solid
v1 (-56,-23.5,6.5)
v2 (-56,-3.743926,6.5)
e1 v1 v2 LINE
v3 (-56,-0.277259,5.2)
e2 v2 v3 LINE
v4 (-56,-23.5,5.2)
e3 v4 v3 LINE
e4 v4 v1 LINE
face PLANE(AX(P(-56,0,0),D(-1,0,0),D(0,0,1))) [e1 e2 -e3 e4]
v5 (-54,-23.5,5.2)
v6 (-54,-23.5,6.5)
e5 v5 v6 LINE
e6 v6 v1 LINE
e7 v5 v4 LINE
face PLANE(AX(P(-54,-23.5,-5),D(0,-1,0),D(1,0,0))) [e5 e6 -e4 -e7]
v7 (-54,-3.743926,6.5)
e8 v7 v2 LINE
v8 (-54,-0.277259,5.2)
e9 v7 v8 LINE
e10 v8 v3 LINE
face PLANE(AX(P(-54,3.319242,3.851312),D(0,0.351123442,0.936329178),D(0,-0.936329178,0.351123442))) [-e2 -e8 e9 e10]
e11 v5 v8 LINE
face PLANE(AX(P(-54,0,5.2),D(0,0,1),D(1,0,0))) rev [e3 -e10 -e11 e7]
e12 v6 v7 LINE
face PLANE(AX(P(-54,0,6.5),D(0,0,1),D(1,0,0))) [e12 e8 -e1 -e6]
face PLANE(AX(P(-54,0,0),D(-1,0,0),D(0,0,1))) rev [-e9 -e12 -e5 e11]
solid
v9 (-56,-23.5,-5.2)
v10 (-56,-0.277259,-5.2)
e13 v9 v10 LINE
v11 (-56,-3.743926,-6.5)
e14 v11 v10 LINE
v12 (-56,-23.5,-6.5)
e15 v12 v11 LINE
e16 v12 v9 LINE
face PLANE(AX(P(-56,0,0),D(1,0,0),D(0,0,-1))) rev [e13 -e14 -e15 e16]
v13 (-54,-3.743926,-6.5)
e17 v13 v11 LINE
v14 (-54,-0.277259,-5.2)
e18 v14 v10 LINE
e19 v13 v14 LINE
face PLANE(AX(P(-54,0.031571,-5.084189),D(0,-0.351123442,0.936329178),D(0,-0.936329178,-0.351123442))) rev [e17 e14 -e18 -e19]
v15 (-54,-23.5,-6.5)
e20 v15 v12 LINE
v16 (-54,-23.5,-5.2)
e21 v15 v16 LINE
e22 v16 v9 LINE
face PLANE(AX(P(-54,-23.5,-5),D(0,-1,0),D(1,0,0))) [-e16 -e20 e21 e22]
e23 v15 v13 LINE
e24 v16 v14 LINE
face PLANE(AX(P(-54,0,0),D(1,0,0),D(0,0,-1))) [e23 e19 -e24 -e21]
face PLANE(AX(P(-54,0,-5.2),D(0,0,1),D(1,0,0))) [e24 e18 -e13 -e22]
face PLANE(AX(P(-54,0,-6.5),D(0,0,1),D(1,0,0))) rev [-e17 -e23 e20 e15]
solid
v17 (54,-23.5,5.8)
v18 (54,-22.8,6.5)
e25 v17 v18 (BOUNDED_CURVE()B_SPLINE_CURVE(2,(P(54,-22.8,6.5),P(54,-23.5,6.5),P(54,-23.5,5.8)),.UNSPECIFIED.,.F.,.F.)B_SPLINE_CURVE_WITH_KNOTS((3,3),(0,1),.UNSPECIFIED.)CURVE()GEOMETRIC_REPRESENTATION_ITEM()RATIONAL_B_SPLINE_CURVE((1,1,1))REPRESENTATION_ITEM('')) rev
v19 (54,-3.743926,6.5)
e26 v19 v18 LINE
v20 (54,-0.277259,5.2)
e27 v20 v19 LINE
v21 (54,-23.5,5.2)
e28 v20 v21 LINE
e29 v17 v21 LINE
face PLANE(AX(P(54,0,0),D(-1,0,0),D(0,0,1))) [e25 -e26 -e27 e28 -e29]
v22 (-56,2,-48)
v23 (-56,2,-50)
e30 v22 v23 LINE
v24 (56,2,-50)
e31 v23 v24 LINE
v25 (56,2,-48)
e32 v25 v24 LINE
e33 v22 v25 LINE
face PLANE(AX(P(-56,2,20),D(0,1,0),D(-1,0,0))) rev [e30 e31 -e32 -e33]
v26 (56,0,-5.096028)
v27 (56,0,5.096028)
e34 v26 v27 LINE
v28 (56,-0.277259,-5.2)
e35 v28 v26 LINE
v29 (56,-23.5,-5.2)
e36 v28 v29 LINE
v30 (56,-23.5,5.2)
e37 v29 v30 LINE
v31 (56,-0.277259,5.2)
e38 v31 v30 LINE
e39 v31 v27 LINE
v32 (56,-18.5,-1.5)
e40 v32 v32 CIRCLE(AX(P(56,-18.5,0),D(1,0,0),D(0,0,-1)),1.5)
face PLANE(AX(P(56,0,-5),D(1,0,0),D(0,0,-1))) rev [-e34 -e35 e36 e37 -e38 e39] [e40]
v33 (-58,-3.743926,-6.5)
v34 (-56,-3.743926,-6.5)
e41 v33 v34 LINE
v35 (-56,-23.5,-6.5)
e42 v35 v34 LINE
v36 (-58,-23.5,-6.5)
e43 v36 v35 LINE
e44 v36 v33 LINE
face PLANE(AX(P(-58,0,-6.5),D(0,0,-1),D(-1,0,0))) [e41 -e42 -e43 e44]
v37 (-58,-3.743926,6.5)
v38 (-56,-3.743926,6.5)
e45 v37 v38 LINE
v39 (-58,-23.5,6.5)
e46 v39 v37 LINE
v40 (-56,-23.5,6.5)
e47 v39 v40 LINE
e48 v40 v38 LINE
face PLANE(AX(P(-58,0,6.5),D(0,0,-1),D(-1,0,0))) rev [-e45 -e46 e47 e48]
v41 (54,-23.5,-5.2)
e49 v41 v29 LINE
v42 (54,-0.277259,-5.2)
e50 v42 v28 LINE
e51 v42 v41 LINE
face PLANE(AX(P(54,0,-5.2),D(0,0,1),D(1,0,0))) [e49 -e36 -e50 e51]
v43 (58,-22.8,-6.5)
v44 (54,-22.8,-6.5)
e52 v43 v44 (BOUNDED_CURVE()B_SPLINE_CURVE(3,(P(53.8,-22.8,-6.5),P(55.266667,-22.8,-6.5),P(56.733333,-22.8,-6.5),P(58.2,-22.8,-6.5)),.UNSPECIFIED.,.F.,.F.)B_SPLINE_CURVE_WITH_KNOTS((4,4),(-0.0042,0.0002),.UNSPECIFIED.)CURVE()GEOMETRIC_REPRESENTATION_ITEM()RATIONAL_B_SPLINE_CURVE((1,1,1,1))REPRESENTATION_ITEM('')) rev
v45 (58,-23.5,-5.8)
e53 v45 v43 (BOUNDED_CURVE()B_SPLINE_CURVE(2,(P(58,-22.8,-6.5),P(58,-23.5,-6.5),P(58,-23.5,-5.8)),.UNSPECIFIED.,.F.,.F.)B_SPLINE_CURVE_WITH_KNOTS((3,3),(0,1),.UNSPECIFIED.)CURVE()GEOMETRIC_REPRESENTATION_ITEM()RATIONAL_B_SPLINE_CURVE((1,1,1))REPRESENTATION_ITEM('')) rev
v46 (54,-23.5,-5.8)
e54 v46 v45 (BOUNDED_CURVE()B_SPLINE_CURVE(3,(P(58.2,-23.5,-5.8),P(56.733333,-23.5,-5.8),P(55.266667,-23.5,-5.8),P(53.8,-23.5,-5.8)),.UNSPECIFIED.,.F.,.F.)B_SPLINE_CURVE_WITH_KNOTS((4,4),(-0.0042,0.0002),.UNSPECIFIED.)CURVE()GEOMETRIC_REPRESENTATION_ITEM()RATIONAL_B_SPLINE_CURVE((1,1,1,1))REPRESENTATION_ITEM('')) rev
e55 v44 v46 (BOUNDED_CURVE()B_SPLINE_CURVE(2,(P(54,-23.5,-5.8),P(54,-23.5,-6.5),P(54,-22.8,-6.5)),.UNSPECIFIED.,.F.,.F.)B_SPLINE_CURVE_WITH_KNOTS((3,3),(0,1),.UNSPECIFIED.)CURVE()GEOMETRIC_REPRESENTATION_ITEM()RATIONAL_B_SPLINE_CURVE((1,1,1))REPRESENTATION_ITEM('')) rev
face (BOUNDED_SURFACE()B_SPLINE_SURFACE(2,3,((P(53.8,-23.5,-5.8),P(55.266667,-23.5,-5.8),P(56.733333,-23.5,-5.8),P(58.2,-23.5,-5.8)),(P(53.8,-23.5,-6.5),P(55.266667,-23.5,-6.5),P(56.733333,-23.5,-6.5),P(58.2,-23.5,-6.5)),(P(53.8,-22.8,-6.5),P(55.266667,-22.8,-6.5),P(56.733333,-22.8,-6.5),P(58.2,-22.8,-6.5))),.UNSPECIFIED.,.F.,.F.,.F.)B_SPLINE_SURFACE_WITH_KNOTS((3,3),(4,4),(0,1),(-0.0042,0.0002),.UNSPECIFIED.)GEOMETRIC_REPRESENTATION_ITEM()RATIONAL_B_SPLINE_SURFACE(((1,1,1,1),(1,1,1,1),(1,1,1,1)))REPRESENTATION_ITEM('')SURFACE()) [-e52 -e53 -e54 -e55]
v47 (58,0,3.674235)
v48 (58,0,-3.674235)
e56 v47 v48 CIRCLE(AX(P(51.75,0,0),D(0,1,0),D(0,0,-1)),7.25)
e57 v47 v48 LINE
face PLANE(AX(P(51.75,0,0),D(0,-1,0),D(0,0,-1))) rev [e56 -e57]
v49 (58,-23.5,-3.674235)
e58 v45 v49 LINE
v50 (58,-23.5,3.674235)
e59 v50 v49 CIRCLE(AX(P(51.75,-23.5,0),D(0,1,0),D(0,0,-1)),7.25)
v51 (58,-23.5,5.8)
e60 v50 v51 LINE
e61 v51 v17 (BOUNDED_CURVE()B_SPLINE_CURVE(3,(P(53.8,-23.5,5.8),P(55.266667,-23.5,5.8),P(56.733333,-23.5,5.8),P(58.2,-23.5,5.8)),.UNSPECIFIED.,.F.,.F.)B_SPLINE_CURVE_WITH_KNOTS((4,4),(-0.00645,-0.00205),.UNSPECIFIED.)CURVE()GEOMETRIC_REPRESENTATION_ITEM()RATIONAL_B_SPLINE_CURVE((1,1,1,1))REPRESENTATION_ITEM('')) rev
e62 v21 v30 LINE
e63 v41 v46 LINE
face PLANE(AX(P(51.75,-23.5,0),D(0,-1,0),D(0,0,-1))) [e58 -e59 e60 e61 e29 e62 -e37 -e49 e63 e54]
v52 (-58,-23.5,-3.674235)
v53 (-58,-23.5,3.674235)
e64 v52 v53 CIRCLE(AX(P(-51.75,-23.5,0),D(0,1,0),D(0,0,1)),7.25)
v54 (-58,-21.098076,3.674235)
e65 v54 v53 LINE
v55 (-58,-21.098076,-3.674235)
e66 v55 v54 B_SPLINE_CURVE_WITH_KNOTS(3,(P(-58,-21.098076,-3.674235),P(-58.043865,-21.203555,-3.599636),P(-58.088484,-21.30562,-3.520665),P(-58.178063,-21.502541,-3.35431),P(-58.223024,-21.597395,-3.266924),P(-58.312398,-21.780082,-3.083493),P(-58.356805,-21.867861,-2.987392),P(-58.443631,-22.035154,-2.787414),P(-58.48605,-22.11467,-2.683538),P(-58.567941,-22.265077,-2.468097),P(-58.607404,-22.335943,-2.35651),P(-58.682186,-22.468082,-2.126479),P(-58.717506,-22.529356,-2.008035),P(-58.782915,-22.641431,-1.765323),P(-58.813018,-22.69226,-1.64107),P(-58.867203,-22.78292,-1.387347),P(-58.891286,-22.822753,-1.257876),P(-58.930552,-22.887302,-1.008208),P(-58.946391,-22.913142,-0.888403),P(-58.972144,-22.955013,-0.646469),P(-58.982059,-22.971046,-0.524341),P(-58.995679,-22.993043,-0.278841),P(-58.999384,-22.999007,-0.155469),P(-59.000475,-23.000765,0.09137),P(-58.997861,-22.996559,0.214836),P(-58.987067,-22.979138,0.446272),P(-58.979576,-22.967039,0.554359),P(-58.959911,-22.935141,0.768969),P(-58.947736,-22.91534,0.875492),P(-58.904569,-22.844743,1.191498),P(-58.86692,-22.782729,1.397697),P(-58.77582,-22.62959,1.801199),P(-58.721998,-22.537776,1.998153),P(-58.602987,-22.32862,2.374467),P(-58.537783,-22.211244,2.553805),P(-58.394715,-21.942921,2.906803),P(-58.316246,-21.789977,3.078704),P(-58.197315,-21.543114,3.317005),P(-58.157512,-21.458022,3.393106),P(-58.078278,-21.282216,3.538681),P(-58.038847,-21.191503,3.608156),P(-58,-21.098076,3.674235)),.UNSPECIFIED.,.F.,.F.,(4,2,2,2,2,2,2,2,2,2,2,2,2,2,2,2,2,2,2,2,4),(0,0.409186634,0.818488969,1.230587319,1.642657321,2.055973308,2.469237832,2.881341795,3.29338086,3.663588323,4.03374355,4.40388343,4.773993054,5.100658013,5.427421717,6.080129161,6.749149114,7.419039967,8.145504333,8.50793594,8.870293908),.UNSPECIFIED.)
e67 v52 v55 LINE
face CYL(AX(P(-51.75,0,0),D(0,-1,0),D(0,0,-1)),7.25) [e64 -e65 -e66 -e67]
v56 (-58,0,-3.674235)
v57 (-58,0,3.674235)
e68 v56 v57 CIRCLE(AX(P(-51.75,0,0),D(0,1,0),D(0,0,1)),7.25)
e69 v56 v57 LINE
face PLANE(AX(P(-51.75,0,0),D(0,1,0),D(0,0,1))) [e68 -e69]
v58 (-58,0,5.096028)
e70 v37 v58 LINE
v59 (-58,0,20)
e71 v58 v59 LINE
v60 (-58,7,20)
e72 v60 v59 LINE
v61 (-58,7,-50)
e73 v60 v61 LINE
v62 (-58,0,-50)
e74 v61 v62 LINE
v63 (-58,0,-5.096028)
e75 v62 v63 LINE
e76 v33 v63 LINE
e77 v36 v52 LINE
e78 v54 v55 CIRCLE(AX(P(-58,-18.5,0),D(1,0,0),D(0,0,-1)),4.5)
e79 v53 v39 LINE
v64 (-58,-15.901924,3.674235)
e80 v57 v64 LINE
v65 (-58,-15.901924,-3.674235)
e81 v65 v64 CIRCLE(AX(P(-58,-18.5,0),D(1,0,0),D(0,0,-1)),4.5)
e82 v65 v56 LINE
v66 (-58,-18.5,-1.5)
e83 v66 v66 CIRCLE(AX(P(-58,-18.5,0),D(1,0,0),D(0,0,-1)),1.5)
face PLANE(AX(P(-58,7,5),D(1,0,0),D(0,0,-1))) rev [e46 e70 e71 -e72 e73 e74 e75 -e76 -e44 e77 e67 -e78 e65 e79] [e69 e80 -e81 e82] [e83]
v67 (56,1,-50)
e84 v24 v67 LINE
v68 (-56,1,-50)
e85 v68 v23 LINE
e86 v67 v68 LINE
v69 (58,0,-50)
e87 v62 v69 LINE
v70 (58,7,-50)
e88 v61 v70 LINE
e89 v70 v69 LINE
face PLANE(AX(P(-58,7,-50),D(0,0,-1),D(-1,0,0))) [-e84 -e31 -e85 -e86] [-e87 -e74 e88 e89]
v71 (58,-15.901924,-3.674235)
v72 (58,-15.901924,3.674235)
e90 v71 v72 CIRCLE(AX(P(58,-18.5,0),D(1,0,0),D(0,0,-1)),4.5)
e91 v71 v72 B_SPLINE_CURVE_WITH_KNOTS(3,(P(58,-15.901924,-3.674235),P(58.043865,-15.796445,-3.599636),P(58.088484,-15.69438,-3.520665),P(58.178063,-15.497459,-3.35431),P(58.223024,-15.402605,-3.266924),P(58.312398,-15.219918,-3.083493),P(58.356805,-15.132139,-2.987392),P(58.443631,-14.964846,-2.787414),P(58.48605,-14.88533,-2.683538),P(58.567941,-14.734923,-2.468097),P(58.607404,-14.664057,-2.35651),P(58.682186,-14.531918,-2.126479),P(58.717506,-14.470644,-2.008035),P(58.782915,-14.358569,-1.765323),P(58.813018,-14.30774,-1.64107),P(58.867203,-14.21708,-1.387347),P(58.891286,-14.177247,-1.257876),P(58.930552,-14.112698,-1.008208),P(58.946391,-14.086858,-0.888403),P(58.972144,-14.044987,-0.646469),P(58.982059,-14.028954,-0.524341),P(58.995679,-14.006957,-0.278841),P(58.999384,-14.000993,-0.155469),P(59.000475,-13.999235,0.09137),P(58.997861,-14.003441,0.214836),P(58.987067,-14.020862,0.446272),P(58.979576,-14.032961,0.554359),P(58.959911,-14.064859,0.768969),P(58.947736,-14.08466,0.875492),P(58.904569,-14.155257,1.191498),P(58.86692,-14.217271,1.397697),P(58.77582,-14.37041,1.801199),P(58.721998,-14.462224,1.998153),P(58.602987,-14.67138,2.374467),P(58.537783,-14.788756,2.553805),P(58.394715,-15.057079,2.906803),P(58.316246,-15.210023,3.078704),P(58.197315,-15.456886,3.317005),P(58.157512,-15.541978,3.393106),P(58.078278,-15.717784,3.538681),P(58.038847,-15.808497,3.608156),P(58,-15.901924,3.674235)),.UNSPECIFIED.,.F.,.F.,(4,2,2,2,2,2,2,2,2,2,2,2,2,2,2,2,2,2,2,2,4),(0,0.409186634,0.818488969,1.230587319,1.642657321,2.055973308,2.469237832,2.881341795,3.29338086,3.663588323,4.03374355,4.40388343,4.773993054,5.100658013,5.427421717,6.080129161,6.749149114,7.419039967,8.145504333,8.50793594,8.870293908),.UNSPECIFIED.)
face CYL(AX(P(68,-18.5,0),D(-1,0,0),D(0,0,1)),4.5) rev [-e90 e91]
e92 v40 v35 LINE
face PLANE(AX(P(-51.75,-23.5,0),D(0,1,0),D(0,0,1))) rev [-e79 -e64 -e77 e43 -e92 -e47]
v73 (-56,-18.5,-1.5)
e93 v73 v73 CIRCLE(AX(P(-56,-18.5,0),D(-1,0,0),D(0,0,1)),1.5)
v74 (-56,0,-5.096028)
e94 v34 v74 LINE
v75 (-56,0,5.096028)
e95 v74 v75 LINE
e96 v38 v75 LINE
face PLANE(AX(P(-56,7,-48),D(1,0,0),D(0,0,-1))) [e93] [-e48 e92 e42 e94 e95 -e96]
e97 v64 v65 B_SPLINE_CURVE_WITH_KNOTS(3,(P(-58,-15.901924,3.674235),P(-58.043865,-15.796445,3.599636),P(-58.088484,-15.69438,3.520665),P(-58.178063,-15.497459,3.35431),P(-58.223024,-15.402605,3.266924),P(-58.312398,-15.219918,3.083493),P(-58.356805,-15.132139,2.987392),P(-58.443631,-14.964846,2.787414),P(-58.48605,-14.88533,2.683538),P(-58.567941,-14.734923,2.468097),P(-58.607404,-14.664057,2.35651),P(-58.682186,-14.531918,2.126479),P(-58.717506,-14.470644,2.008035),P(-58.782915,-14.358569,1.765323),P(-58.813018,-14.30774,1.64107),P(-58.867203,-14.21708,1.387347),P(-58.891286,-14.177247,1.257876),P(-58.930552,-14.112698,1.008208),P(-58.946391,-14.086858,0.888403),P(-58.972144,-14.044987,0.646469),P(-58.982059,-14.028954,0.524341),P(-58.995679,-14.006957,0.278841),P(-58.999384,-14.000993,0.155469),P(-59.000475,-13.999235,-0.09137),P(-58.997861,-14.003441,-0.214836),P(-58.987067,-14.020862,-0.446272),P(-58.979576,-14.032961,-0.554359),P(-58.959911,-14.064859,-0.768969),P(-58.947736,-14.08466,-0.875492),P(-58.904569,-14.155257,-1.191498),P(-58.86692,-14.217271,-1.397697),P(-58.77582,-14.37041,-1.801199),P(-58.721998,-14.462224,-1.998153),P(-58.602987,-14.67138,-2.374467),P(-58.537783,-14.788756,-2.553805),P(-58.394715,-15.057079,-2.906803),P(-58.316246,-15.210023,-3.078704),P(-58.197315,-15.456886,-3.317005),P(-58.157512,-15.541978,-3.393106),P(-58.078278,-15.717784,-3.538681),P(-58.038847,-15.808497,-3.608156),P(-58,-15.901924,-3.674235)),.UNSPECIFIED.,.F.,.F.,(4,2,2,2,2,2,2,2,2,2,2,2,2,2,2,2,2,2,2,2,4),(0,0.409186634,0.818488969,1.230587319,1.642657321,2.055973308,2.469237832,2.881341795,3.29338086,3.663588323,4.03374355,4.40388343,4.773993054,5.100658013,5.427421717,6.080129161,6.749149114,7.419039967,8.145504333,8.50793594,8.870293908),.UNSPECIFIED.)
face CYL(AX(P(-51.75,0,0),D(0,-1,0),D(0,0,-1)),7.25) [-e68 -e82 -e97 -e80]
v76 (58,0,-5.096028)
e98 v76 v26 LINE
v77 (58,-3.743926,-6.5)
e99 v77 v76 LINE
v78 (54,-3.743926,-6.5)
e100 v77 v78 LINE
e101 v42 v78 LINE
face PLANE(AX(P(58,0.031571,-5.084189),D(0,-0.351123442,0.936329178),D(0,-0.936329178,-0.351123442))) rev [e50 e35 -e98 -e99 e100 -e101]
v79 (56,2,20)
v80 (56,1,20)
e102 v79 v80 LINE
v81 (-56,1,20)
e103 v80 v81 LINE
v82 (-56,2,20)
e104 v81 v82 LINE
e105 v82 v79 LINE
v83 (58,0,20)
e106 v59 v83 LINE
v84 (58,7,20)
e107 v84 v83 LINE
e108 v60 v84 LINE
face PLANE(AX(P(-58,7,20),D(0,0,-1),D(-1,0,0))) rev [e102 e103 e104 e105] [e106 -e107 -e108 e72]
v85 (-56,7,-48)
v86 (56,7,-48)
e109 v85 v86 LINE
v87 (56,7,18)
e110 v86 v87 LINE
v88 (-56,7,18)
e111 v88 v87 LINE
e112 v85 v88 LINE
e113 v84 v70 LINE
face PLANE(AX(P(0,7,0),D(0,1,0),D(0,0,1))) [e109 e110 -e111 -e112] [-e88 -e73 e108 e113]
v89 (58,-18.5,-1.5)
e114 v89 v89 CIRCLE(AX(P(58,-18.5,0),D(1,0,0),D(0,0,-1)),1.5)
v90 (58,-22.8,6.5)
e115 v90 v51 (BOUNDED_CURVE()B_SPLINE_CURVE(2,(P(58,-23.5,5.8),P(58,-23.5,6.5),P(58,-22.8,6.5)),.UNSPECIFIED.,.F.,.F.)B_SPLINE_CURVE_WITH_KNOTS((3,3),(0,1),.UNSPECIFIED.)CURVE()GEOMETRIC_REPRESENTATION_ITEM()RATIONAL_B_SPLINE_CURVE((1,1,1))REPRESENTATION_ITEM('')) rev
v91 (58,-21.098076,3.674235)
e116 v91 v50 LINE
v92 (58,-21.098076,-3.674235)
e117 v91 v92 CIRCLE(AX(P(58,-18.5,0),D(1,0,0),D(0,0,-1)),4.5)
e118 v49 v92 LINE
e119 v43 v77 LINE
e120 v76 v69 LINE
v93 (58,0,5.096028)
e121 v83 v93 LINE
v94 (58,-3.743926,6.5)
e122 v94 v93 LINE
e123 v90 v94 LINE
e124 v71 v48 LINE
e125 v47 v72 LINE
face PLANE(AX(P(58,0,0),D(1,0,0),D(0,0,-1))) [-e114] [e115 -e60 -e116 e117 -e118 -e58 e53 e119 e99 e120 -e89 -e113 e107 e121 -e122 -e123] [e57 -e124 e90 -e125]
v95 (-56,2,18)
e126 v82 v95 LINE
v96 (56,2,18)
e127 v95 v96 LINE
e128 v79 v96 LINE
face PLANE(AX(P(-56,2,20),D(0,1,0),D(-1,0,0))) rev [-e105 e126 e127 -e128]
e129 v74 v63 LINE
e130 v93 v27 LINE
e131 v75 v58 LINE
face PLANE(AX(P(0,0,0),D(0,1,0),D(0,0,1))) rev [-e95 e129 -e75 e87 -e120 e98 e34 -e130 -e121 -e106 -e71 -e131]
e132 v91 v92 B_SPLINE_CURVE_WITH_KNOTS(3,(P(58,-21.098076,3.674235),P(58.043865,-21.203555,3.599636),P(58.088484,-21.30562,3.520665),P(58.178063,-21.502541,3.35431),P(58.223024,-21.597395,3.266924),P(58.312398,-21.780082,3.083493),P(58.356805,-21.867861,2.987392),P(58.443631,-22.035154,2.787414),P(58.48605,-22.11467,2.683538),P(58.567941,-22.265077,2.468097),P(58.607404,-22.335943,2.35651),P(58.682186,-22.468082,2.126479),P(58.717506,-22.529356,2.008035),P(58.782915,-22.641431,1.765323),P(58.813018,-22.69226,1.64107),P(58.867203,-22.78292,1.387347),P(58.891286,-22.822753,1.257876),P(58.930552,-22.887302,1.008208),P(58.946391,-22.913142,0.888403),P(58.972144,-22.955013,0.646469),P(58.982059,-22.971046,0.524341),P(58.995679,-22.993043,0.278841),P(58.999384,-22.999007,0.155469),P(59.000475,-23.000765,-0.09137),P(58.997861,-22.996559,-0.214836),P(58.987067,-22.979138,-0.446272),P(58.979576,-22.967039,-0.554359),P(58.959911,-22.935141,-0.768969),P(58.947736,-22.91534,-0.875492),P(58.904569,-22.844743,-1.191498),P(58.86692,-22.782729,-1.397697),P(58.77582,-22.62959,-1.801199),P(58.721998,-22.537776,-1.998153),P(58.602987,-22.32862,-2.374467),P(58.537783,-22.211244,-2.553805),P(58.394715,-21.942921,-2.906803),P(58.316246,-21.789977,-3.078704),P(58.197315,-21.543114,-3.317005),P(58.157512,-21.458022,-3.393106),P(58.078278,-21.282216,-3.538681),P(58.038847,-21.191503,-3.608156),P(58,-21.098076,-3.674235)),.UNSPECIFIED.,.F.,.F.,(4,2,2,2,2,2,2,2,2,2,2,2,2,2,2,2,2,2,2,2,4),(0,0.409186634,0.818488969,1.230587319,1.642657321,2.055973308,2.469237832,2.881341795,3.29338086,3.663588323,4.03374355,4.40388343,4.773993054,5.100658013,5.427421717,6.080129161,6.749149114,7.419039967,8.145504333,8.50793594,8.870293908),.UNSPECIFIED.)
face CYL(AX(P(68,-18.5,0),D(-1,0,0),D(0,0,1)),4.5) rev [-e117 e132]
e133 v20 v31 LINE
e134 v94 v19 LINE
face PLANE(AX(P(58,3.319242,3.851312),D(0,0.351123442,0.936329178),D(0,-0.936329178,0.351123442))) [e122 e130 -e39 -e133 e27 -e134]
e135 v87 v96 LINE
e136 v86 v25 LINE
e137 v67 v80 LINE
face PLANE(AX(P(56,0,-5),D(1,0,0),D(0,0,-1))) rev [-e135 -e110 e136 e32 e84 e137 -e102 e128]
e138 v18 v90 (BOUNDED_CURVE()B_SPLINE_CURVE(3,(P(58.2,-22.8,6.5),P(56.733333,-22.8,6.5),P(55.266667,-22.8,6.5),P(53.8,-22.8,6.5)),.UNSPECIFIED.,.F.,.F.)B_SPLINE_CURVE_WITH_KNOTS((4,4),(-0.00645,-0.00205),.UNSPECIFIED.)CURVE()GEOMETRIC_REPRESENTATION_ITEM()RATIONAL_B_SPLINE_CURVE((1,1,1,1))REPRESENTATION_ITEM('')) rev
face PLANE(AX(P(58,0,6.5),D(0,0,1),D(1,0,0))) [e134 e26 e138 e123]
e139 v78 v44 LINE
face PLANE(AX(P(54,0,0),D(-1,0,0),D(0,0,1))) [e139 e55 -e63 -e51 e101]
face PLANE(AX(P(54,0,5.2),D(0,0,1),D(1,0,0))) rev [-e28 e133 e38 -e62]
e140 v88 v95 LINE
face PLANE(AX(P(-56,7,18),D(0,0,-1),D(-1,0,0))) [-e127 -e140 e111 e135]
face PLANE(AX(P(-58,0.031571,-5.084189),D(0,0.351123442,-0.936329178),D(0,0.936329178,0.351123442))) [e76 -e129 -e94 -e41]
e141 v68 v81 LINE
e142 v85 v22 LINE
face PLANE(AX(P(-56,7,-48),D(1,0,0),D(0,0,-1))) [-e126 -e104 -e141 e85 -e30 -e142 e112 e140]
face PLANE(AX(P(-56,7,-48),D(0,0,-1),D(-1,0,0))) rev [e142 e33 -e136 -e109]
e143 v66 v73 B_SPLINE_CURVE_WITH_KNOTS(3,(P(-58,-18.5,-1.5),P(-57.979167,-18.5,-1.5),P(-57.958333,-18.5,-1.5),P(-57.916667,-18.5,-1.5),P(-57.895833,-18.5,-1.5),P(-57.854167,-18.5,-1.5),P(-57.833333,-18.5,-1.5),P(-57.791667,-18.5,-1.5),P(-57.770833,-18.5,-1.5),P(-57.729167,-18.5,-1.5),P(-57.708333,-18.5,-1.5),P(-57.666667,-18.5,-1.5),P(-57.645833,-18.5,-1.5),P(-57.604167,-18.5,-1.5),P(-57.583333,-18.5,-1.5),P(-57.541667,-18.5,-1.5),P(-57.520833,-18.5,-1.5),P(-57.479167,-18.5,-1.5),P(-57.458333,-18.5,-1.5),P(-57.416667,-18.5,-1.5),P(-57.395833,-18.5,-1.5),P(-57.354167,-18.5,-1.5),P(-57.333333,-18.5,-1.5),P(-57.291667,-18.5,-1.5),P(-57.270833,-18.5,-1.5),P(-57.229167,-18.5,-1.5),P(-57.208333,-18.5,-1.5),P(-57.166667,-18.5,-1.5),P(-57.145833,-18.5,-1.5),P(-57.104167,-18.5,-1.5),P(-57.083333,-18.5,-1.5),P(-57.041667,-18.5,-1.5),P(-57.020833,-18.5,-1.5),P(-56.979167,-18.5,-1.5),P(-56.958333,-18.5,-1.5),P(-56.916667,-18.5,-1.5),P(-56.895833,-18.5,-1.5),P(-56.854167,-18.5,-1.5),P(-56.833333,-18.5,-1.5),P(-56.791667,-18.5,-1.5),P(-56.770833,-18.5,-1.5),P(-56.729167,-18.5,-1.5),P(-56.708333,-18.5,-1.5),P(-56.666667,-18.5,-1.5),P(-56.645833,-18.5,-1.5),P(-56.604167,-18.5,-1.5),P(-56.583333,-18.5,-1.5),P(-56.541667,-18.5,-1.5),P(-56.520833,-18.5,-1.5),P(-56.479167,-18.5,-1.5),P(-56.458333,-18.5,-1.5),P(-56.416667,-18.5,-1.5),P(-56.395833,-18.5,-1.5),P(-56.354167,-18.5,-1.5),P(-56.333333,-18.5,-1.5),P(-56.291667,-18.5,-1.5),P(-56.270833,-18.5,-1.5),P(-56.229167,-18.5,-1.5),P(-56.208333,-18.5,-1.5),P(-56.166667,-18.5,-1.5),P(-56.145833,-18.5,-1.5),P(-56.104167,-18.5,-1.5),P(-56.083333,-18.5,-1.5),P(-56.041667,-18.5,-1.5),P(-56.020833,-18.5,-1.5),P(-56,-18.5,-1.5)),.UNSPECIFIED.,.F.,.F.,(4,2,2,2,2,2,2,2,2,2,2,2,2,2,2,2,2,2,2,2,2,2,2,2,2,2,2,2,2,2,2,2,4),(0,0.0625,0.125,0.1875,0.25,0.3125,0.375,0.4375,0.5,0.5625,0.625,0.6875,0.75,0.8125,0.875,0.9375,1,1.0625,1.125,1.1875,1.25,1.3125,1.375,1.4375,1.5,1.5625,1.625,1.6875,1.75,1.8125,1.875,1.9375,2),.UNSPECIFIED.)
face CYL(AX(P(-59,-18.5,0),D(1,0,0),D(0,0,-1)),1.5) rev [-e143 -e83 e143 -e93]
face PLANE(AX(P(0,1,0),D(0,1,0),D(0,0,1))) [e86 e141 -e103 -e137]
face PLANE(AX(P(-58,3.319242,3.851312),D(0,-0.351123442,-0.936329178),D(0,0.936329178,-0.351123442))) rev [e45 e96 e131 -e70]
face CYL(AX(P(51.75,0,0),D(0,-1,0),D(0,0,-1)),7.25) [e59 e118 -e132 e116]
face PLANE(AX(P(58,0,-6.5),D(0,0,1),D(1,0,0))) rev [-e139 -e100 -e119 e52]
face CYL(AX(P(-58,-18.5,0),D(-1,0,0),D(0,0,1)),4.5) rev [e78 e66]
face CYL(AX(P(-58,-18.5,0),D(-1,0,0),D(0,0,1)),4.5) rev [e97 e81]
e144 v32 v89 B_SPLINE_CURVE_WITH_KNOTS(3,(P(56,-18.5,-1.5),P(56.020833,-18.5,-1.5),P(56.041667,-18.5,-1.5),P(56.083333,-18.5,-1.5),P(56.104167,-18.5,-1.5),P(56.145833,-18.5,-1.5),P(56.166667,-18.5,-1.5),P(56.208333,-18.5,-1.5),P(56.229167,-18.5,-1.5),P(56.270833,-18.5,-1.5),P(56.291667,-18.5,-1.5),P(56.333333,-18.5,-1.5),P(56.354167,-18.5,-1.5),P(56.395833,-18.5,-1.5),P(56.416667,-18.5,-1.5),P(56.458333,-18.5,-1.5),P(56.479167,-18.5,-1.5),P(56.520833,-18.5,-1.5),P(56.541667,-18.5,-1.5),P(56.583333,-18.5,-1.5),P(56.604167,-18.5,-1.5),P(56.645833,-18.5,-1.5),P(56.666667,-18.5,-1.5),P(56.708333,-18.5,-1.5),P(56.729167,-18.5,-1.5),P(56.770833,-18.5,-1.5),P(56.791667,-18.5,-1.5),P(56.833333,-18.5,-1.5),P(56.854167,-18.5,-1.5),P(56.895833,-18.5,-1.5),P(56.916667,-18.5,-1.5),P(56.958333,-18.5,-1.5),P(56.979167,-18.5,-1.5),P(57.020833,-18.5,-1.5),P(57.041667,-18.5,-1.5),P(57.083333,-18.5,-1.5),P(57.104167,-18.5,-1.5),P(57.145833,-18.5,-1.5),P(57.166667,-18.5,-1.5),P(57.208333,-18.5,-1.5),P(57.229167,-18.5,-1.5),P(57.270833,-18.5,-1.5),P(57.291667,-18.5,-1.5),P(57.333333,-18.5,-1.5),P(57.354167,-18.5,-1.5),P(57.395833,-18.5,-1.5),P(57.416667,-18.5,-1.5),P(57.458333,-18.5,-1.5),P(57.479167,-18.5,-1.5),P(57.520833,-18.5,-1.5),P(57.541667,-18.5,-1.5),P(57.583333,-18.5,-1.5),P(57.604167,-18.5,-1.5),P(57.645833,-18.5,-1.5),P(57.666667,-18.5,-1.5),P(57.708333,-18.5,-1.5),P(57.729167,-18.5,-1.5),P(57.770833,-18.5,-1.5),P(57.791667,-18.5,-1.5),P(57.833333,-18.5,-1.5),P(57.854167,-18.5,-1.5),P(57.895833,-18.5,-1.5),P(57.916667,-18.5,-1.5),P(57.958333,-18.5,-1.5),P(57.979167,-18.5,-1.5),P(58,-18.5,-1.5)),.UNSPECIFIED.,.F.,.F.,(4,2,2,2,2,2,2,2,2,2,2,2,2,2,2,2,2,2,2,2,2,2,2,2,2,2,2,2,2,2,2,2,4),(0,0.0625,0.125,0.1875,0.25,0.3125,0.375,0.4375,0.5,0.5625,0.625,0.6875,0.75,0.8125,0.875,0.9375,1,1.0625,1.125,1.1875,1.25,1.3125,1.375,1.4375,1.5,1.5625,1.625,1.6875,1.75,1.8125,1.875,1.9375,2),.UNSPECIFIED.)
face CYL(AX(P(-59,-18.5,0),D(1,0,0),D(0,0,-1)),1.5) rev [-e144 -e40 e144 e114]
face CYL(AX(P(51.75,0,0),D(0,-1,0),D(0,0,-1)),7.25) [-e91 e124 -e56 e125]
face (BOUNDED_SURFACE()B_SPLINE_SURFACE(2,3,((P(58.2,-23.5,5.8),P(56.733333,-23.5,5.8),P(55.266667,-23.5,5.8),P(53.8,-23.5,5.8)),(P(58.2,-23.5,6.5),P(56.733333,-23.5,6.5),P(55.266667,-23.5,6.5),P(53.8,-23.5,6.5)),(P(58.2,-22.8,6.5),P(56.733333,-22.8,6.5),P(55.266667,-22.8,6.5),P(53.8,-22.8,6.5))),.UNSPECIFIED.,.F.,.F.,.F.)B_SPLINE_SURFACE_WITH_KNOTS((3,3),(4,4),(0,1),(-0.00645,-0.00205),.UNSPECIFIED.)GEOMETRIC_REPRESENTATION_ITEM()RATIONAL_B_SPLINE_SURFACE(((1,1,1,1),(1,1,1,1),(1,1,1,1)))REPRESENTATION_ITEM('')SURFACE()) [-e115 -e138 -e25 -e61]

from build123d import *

# Parameters (mm, degrees)
DODANIE_WYCI_GNI_CIE1_DEPTH     = 2
DODANIE_WYCI_GNI_CIE2_DEPTH     = 2
DODANIE_WYCI_GNI_CIE3_START     = -114
DODANIE_WYCI_GNI_CIE3_DEPTH     = 2
DODANIE_WYCI_GNI_CIE4_START     = -112
DODANIE_WYCI_GNI_CIE4_DEPTH     = 2
DODANIE_WYCI_GNI_CIE4_2_DEPTH   = 2
WYTNIJ_WYCI_GNI_CIE1_DEPTH      = 118.556369457
WYTNIJ_WYCI_GNI_CIE1_DEPTH_BACK = 118.556369457
SZKIC4_R                        = 1.5
ZAOKR_GLENIE18_SIZE             = 0.7
WYTNIJ_WYCI_GNI_CIE2_START      = 2
SZKIC4_3_R                      = 4.5
SZKIC4_3_R_2                    = 1.5
WYTNIJ_WYCI_GNI_CIE2_DEPTH      = 10
WYTNIJ_WYCI_GNI_CIE3_START      = -116
SZKIC4_4_R                      = 4.5
SZKIC4_4_R_2                    = 1.5
WYTNIJ_WYCI_GNI_CIE3_DEPTH      = 2
SZKIC9_W                        = 112
SZKIC9_H                        = 66
DODANIE_WYCI_GNI_CIE5_DEPTH     = 7
SZKIC9_4_W                      = 112
SZKIC9_4_H                      = 66
DODANIE_WYCI_GNI_CIE6_DEPTH     = 1
SZKIC11_W                       = 112
SZKIC11_H                       = 1
WYTNIJ_WYCI_GNI_CIE4_DEPTH      = 95.515871844


with BuildPart() as part:
    # Wyciągnięcie po ścieżce6: sweep along a path in Szkic8
    with BuildLine(Plane.XY) as wyci_gni_cie_po_cie_ce6_path:
        Line((-57, 0), (-57, -23.5))
    # Szkic3 → Wyciągnięcie po ścieżce6 (sweep)
    with BuildSketch(Plane(origin=(0, 0, 0), x_dir=(1, 0, 0), z_dir=(0, 1, 0))):
        with BuildLine():
            Line((56, 5), (57, 5))
            ThreePointArc((57, 5), (59, 0), (57, -5))
            Line((57, -5), (56, -5))
            Line((56, -5), (56, 5))
        make_face()
        with BuildLine():
            Line((-56, -5), (-57, -5))
            ThreePointArc((-57, -5), (-59, 0), (-57, 5))
            Line((-57, 5), (-56, 5))
            Line((-56, 5), (-56, -5))
        make_face()
    sweep(path=wyci_gni_cie_po_cie_ce6_path.line)

    # Dodanie-wyciągnięcie1: read off the stored shape, not the designer's step
    # Dodanie-wyciągnięcie1 outline → Dodanie-wyciągnięcie1 (add)
    with BuildSketch(Plane(origin=(56, 0, 0), x_dir=(0, 0, -1), z_dir=(1, 0, 0))):
        Polygon((-6.5, -3.743926041), (-6.5, -23.5), (6.5, -23.5), (6.5, -3.743926041), (5, 0.256073959), (5, 0), (-5, 0), (-5, 0.256073959), align=None)
    extrude(amount=DODANIE_WYCI_GNI_CIE1_DEPTH)

    # Szkic5<3> → Dodanie-wyciągnięcie2 (add)
    with BuildSketch(Plane(origin=(56, 0, 0), x_dir=(0, 0, -1), z_dir=(1, 0, 0))):
        Polygon((6.5, -3.743926041), (5.2, -0.277259374), (5.2, -23.5), (6.5, -23.5), align=None)
        Polygon((-5.2, -0.277259374), (-6.5, -3.743926041), (-6.5, -23.5), (-5.2, -23.5), align=None)
    extrude(amount=-DODANIE_WYCI_GNI_CIE2_DEPTH)


with BuildPart() as body_2:
    # Dodanie-wyciągnięcie3: read off the stored shape, not the designer's step
    # Dodanie-wyciągnięcie3 outline → Dodanie-wyciągnięcie3 (new body)
    with BuildSketch(Plane(origin=(56, 0, 0), x_dir=(0, 0, -1), z_dir=(1, 0, 0)).offset(DODANIE_WYCI_GNI_CIE3_START)):
        Polygon((5, 0.256073959), (5, 0), (-5, 0), (-5, 0.256073959), (-6.5, -3.743926041), (-6.5, -23.5), (6.5, -23.5), (6.5, -3.743926041), align=None)
    extrude(amount=DODANIE_WYCI_GNI_CIE3_DEPTH)


with BuildPart() as body_3:
    # Szkic5<6> → Dodanie-wyciągnięcie4 (new body)
    with BuildSketch(Plane(origin=(56, 0, 0), x_dir=(0, 0, -1), z_dir=(1, 0, 0)).offset(DODANIE_WYCI_GNI_CIE4_START)):
        Polygon((-5.2, -0.277259374), (-6.5, -3.743926041), (-6.5, -23.5), (-5.2, -23.5), align=None)
    extrude(amount=DODANIE_WYCI_GNI_CIE4_DEPTH)


with BuildPart() as body_4:
    # Szkic5<6> → Dodanie-wyci_gni_cie4 2 (new body)
    with BuildSketch(Plane(origin=(56, 0, 0), x_dir=(0, 0, -1), z_dir=(1, 0, 0)).offset(DODANIE_WYCI_GNI_CIE4_START)):
        Polygon((6.5, -3.743926041), (5.2, -0.277259374), (5.2, -23.5), (6.5, -23.5), align=None)
    extrude(amount=DODANIE_WYCI_GNI_CIE4_2_DEPTH)


with BuildPart() as wytnij_wyci_gni_cie1_tool:
    # Szkic4 → Wytnij-wyciągnięcie1 (new, two sides: drawn at the far end of the back side and taken through both)
    with BuildSketch(Plane(origin=(56, 0, 0), x_dir=(0, 0, -1), z_dir=(1, 0, 0)).offset(-WYTNIJ_WYCI_GNI_CIE1_DEPTH_BACK)):
        with Locations((0, -18.5)):
            Circle(SZKIC4_R)
    extrude(amount=WYTNIJ_WYCI_GNI_CIE1_DEPTH + WYTNIJ_WYCI_GNI_CIE1_DEPTH_BACK)


with BuildPart() as part_1:
    add(part.part)

    # Wytnij-wyciągnięcie1: cut by wytnij_wyci_gni_cie1_tool
    add(wytnij_wyci_gni_cie1_tool.part, mode=Mode.SUBTRACT)

    # Zaokrąglenie18
    # a fillet whose section is not a circle: 0.7 mm, written as the material it takes off along each edge
    with BuildSketch(Plane(origin=(59.75, -23.5, 6.5), x_dir=(0, 0, -1), z_dir=(-1, 0, 0)), Plane(origin=(52.25, -23.5, -6.5), x_dir=(0, 0, 1), z_dir=(1, 0, 0))) as zaokr_glenie18_piece_1:
        with BuildLine():
            Bezier((ZAOKR_GLENIE18_SIZE, 0), (0, 0), (0, -ZAOKR_GLENIE18_SIZE), weights=[1, 1, 1])
            Line((0, -ZAOKR_GLENIE18_SIZE), (0, 0))
            Line((0, 0), (ZAOKR_GLENIE18_SIZE, 0))
        make_face()
    extrude(amount=7.5, mode=Mode.SUBTRACT)

    # Szkic4<3> → Wytnij-wyciągnięcie2 (cut)
    with BuildSketch(Plane(origin=(56, 0, 0), x_dir=(0, 0, -1), z_dir=(1, 0, 0)).offset(WYTNIJ_WYCI_GNI_CIE2_START)):
        with Locations((0, -18.5)):
            Circle(SZKIC4_3_R)
        with Locations((0, -18.5)):
            Circle(SZKIC4_3_R_2, mode=Mode.SUBTRACT)
    extrude(amount=WYTNIJ_WYCI_GNI_CIE2_DEPTH, mode=Mode.SUBTRACT)

    # Szkic4<4> → Wytnij-wyciągnięcie3 (cut)
    with BuildSketch(Plane(origin=(56, 0, 0), x_dir=(0, 0, -1), z_dir=(1, 0, 0)).offset(WYTNIJ_WYCI_GNI_CIE3_START)):
        with Locations((0, -18.5)):
            Circle(SZKIC4_4_R)
        with Locations((0, -18.5)):
            Circle(SZKIC4_4_R_2, mode=Mode.SUBTRACT)
    extrude(amount=WYTNIJ_WYCI_GNI_CIE3_DEPTH, mode=Mode.SUBTRACT)



with BuildPart() as body_2_1:
    add(body_2.part)

    # Wytnij-wyciągnięcie1: cut by wytnij_wyci_gni_cie1_tool
    add(wytnij_wyci_gni_cie1_tool.part, mode=Mode.SUBTRACT)


with BuildPart() as part_2:
    add(part_1.part)

    add(body_2_1.part)  # Dodanie-wyciągnięcie5 merges body 2
    # Szkic9 → Dodanie-wyciągnięcie5 (add)
    with BuildSketch(Plane(origin=(0, 0, 0), x_dir=(1, 0, 0), z_dir=(0, 1, 0))):
        Polygon((58, -5), (58, 50), (-58, 50), (-58, -5), (-58, -20), (58, -20), align=None)
        with Locations((0, 15)):
            Rectangle(SZKIC9_W, SZKIC9_H, mode=Mode.SUBTRACT)
    extrude(amount=DODANIE_WYCI_GNI_CIE5_DEPTH)

    # Szkic9<4> → Dodanie-wyciągnięcie6 (add)
    with BuildSketch(Plane(origin=(0, 0, 0), x_dir=(1, 0, 0), z_dir=(0, 1, 0))):
        with Locations((0, 15)):
            Rectangle(SZKIC9_4_W, SZKIC9_4_H)
    extrude(amount=DODANIE_WYCI_GNI_CIE6_DEPTH)

    # Szkic11 → Wytnij-wyciągnięcie4 (cut, through all)
    with BuildSketch(Plane(origin=(0, 0, -50), x_dir=(-1, 0, 0), z_dir=(0, 0, -1))):
        with Locations((0, 1.5)):
            Rectangle(SZKIC11_W, SZKIC11_H)
    extrude(amount=-WYTNIJ_WYCI_GNI_CIE4_DEPTH, mode=Mode.SUBTRACT)


solid = Compound([body_3.part, body_4.part, part_2.part])
